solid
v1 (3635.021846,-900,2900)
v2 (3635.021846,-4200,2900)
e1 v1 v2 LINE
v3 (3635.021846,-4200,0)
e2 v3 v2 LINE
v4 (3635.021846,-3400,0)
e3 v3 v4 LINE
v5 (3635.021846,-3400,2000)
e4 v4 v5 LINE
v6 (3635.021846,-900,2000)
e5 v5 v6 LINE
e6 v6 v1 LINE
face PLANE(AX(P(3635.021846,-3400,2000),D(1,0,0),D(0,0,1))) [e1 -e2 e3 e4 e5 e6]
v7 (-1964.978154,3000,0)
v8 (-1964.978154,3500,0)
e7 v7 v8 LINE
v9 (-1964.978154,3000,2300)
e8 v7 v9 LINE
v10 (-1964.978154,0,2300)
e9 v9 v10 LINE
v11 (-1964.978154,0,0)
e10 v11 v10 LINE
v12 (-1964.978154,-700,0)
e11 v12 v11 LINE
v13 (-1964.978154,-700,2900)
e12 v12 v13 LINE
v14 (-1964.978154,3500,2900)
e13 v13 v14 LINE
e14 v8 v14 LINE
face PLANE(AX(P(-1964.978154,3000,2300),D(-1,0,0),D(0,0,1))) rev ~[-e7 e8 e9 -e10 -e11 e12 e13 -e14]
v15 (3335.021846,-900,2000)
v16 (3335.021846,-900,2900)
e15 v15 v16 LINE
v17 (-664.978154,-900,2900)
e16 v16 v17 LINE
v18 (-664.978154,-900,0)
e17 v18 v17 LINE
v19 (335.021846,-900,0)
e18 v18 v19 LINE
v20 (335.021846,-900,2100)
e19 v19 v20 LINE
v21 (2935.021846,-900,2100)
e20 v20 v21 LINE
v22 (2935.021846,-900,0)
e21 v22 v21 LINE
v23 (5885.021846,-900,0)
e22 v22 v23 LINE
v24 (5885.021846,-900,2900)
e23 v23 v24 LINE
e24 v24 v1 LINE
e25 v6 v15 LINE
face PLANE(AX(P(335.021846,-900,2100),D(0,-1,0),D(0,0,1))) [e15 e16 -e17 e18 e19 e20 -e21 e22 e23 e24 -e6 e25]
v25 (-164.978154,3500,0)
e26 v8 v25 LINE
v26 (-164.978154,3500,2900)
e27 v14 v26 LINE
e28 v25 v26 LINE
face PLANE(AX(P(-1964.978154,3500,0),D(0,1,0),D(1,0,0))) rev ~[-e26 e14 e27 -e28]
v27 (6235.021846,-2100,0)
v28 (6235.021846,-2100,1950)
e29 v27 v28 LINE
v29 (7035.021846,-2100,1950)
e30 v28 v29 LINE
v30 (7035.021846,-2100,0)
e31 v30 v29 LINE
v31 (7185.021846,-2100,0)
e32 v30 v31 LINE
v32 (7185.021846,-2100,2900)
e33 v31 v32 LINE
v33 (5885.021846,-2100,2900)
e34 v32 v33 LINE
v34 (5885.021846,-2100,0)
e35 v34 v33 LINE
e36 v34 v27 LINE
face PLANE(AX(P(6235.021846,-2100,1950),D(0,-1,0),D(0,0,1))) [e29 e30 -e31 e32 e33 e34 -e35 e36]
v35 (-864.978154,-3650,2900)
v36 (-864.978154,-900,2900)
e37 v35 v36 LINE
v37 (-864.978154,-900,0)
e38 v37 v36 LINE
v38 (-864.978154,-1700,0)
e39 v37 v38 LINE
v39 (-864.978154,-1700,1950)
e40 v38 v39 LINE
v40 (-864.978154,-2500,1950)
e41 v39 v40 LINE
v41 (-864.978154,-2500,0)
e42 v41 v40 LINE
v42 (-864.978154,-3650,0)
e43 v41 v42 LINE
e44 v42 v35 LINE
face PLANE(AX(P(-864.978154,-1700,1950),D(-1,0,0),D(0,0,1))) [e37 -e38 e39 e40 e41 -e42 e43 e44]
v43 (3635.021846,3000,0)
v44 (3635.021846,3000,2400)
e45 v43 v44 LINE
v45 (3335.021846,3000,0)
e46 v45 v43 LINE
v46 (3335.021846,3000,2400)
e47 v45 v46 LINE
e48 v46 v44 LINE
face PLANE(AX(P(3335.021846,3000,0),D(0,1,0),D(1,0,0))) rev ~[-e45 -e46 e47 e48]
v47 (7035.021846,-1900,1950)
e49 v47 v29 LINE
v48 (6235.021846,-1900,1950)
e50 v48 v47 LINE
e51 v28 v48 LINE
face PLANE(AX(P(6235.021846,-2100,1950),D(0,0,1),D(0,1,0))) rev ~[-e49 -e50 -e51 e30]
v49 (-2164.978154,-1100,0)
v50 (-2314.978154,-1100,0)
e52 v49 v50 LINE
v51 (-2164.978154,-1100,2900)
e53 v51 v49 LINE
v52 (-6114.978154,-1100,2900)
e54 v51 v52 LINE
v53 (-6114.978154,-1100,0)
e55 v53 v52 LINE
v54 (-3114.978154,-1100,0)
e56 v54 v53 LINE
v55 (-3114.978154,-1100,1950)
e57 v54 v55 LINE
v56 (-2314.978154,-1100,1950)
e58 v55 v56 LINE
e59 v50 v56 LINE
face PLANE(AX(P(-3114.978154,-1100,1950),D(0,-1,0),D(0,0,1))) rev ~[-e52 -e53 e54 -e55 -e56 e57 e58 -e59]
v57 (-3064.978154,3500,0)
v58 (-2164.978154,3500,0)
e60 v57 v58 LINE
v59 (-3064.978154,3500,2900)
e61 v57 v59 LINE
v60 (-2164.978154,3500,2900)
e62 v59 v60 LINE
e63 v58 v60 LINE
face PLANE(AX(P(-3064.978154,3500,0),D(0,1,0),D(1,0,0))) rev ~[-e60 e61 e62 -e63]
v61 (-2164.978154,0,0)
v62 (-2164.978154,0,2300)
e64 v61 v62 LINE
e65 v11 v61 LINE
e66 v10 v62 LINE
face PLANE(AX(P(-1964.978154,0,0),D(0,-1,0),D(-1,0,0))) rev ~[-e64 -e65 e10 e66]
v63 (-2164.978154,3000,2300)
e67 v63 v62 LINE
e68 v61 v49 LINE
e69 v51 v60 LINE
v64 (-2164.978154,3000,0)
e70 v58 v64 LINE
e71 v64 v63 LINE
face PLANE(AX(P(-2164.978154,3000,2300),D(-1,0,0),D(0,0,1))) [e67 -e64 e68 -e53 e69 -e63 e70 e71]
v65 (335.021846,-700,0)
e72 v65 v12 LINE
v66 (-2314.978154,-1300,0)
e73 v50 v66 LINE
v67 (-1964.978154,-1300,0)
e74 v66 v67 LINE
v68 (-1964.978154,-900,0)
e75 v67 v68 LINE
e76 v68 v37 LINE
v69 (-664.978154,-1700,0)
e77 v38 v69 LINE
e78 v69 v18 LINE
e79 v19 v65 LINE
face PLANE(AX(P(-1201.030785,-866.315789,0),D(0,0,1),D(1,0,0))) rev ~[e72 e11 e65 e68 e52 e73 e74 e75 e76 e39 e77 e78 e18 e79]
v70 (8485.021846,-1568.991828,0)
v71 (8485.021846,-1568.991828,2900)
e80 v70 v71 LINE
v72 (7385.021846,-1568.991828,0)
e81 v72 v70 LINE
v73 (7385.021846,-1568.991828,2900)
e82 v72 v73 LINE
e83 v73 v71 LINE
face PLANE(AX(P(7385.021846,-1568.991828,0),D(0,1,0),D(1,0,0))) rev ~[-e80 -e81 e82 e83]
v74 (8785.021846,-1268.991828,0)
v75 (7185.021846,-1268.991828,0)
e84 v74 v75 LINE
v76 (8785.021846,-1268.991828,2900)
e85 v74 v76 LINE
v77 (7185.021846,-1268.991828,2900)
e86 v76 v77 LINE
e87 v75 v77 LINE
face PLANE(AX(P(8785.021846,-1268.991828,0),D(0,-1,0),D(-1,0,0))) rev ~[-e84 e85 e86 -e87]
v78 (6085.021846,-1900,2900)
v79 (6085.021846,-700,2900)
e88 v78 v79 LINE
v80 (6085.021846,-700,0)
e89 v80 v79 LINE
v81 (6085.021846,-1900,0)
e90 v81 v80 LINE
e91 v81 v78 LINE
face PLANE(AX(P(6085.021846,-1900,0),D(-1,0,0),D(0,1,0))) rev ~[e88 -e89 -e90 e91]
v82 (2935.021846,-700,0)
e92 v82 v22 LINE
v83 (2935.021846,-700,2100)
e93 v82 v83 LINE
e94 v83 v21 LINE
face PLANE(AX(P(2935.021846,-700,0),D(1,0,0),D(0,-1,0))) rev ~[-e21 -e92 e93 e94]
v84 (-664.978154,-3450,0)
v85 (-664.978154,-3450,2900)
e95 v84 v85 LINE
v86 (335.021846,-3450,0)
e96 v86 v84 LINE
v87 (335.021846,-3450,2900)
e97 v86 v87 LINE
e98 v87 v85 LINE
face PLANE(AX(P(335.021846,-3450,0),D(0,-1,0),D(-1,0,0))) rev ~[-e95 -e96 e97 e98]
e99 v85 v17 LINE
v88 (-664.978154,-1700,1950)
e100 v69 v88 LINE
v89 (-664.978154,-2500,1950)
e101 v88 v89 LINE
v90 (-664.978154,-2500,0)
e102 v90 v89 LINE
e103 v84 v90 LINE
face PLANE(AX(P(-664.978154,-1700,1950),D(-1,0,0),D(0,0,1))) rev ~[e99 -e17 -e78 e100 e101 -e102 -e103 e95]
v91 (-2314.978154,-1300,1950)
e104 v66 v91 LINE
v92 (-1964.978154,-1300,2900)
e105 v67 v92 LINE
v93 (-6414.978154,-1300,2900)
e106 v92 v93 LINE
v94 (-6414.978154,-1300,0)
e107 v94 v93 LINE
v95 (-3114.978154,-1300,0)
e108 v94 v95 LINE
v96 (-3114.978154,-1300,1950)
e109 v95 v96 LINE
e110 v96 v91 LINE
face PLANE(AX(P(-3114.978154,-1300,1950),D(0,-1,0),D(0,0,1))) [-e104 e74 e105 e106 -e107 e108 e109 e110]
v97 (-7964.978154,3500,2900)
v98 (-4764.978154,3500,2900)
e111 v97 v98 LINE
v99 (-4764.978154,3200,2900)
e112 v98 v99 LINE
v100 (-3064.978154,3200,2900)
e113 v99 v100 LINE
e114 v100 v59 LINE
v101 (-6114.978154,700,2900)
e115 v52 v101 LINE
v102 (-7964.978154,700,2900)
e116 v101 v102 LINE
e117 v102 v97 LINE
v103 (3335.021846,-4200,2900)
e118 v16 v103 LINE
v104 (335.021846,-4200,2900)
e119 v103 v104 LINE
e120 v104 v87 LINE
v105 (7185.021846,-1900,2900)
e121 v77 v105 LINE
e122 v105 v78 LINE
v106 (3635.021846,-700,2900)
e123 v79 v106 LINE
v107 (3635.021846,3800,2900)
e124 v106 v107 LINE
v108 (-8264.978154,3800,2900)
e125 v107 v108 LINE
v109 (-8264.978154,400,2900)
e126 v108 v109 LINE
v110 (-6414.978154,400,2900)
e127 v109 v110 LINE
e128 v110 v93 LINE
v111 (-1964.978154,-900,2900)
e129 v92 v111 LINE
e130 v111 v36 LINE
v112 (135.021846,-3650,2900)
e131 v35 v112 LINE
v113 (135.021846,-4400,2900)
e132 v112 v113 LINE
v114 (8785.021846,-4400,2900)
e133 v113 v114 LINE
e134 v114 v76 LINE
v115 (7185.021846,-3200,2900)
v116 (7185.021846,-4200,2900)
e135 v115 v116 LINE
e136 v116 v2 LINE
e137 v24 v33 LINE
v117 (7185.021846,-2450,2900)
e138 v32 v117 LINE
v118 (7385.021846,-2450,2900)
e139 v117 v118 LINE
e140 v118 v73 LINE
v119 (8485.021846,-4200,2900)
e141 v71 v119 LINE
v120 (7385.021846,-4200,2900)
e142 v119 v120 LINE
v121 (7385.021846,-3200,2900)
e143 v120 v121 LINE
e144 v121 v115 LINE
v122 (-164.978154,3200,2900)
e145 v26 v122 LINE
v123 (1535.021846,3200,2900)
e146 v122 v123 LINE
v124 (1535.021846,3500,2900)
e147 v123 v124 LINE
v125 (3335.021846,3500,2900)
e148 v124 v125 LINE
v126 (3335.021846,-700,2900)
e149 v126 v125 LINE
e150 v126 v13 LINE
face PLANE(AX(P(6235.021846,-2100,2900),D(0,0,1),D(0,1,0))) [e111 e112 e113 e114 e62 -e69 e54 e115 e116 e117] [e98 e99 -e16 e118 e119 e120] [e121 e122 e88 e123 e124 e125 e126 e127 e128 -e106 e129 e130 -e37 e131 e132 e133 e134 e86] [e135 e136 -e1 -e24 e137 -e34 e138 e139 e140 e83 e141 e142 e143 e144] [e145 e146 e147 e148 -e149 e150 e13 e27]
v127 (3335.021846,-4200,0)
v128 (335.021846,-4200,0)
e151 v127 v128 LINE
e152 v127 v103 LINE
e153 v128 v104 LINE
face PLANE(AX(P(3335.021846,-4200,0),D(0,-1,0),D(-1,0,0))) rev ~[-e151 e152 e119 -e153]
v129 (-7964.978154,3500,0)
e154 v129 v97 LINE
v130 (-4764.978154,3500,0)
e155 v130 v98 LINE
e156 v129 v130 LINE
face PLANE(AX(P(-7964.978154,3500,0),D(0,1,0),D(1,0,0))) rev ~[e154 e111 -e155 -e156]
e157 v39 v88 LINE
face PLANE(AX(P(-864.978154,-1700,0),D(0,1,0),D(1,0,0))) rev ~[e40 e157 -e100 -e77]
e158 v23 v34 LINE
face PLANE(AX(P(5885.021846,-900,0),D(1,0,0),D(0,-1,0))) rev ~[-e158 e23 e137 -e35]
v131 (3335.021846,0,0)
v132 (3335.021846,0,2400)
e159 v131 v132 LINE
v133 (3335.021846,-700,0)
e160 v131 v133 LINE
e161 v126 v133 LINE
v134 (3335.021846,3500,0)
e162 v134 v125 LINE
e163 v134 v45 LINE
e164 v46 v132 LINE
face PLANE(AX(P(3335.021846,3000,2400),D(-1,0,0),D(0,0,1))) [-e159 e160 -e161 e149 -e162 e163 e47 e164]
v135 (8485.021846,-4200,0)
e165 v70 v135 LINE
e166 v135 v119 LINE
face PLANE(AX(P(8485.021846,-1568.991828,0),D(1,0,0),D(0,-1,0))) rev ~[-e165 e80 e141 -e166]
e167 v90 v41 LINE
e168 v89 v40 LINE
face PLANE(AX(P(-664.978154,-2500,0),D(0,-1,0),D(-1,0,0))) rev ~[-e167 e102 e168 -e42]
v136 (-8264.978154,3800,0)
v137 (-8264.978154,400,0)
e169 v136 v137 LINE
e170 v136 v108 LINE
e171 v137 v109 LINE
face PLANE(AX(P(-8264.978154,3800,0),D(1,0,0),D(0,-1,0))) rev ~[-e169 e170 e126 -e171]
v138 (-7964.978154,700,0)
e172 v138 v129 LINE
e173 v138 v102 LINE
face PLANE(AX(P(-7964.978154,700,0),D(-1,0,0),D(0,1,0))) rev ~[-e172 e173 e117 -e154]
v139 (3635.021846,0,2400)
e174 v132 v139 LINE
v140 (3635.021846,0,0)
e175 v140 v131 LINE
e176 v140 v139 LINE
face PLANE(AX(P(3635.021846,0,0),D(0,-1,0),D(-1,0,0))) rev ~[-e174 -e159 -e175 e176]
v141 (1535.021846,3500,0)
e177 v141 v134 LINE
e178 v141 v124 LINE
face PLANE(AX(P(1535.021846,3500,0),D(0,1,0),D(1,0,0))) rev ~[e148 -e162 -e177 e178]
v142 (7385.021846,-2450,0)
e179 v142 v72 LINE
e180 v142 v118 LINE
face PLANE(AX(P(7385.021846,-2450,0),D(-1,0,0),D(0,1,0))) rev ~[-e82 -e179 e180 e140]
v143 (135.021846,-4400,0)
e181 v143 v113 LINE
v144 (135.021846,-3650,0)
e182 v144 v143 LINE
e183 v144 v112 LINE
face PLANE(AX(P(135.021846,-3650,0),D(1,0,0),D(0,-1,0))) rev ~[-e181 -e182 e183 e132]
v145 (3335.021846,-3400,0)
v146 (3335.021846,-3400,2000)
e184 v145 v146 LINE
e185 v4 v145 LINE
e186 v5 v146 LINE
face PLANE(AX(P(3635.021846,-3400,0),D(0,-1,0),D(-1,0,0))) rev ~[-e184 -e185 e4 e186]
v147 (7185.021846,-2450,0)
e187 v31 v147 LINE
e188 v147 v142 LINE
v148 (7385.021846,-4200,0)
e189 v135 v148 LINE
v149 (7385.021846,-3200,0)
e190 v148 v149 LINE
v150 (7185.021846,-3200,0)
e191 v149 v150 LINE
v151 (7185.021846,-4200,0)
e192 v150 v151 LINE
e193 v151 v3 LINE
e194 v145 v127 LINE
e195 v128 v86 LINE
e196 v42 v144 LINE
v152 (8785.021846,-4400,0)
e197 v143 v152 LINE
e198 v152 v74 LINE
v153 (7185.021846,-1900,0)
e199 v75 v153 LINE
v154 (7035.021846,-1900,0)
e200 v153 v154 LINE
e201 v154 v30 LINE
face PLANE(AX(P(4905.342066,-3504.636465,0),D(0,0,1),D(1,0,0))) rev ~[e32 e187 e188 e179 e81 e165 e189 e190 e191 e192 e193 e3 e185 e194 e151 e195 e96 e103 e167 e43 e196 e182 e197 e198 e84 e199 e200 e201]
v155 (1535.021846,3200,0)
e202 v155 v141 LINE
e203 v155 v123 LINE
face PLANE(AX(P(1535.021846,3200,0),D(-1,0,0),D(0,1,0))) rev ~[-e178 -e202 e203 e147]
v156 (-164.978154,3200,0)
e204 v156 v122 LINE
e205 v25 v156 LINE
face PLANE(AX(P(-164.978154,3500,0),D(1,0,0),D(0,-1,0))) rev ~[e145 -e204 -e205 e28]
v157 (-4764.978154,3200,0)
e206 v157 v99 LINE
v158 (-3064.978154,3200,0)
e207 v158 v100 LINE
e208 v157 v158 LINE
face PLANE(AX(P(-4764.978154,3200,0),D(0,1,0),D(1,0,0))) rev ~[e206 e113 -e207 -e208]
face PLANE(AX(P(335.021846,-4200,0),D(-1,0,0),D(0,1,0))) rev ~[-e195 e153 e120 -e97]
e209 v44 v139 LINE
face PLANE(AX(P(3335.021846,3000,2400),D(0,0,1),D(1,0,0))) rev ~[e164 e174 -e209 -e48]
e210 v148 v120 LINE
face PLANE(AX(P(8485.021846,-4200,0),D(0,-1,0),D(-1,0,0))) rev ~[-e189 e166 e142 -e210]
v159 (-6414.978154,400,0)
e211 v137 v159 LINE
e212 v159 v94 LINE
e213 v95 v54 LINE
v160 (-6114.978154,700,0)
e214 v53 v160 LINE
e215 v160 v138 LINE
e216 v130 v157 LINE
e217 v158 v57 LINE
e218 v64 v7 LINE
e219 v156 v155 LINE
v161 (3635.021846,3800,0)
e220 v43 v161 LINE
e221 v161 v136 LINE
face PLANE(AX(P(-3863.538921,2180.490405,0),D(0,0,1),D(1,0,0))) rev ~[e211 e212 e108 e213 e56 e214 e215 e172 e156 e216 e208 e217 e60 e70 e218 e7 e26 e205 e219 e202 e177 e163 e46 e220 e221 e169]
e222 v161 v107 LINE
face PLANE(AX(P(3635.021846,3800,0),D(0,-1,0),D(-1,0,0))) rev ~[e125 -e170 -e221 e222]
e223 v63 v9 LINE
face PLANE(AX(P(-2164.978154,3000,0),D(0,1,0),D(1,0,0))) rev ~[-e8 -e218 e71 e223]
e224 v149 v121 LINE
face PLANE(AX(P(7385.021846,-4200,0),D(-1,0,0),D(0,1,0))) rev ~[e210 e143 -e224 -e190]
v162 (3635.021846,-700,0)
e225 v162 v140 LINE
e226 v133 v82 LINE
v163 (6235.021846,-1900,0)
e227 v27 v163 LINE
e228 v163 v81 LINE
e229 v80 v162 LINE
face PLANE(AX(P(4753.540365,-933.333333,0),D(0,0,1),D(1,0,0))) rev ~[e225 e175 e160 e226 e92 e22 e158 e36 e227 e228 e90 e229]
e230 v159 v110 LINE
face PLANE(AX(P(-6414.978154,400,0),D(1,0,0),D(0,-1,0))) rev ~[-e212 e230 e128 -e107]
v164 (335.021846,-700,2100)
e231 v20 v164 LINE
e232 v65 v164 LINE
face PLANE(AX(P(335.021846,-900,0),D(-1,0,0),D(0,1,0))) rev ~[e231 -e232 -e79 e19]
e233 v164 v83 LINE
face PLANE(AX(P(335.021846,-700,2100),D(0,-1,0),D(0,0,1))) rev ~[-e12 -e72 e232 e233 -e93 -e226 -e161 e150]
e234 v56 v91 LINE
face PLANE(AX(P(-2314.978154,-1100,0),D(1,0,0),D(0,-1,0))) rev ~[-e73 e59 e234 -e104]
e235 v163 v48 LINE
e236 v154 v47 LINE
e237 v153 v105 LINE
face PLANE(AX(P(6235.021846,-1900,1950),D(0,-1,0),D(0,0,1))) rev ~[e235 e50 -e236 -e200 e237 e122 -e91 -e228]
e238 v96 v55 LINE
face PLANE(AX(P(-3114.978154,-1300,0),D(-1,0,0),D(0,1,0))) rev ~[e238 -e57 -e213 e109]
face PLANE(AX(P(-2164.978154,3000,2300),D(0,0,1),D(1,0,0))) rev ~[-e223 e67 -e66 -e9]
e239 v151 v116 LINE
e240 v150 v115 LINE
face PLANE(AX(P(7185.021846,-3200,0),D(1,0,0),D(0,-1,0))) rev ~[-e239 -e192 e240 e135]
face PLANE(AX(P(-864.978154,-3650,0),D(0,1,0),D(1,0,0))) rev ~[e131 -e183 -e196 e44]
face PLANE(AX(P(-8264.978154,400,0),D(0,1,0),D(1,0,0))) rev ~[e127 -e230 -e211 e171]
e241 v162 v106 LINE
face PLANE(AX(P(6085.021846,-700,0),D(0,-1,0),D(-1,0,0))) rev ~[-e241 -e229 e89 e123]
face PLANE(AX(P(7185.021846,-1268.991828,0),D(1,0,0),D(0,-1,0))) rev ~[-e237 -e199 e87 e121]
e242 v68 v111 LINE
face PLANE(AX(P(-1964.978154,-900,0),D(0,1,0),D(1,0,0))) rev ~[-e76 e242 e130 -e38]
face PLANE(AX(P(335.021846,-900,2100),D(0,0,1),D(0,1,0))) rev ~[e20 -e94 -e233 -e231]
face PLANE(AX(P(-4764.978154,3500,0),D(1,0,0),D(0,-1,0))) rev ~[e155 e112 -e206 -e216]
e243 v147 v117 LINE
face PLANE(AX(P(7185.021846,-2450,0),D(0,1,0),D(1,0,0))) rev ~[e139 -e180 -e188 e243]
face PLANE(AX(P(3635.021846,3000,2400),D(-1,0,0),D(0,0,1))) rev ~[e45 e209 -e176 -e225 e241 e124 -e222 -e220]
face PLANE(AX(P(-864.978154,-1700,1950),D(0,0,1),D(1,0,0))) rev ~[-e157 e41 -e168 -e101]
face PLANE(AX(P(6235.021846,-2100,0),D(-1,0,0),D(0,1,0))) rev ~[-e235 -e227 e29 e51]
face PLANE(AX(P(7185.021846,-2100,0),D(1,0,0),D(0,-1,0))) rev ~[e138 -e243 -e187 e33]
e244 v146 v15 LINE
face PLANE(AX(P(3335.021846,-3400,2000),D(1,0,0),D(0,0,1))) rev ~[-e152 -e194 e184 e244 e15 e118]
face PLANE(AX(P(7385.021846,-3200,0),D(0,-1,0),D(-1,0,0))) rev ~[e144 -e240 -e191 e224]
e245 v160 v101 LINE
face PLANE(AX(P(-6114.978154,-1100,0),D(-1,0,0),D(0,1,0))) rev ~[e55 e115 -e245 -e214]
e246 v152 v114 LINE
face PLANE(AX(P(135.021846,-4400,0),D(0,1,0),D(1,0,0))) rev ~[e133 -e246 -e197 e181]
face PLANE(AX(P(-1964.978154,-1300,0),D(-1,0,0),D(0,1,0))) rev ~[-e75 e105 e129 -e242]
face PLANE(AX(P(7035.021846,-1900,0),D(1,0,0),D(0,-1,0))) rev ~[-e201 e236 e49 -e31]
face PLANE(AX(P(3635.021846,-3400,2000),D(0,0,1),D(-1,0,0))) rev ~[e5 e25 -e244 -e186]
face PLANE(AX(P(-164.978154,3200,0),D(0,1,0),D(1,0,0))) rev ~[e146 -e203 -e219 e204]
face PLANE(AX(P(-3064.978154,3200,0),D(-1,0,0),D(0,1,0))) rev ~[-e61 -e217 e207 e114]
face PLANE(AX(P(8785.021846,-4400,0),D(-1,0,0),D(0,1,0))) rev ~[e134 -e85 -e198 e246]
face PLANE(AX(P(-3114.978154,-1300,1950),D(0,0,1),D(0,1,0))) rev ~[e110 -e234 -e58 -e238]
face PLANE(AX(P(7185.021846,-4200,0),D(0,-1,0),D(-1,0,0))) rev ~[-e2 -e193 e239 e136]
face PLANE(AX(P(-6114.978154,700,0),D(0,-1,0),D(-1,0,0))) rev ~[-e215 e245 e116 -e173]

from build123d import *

# Parameters (mm, degrees)
F1_DEPTH  = 2900
F2_W      = 300
F2_H      = 500
F3_DEPTH  = 3000
F4_W      = 200
F4_H      = 600
F5_DEPTH  = 3500
F6_W      = 200
F6_H      = 950
F7_DEPTH  = 1000
F8_W      = 200
F8_H      = 950
F9_DEPTH  = 1000
F10_W     = 200
F10_H     = 800
F11_DEPTH = 3000
F12_W     = 300
F12_H     = 900
F13_DEPTH = 2580
F14_W     = 200
F14_H     = 950
F15_DEPTH = 830


# Not quite as in the source:
# - a feature names something its author has since deleted; it is built from what else it names


with BuildPart() as f1:
    # F0 (on Top) → F1 (new body)
    with BuildSketch(Plane.XY):
        Polygon((3635.0218463784, 3800), (-8264.9781536216, 3800), (-8264.9781536216, 400), (-6414.9781536216, 400), (-6414.9781536216, -1300), (-3114.9781536216, -1300), (-3114.9781536216, -1100), (-6114.9781536216, -1100), (-6114.9781536216, 700), (-7964.9781536216, 700), (-7964.9781536216, 3500), (-4764.9781536216, 3500), (-4764.9781536216, 3200), (-3064.9781536216, 3200), (-3064.9781536216, 3500), (-2164.9781536216, 3500), (-2164.9781536216, 3000), (-1964.9781536216, 3000), (-1964.9781536216, 3500), (-164.9781536216, 3500), (-164.9781536216, 3200), (1535.0218463784, 3200), (1535.0218463784, 3500), (3335.0218463784, 3500), (3335.0218463784, 3000), (3635.0218463784, 3000), align=None)
    extrude(amount=F1_DEPTH)



with BuildPart() as f1b:
    # F0 (on Top) → F1, piece 2 (new body)
    with BuildSketch(Plane.XY):
        Polygon((-2164.9781536216, 0), (-2164.9781536216, -1100), (-2314.9781536216, -1100), (-2314.9781536216, -1300), (-1964.9781536216, -1300), (-1964.9781536216, -900), (-864.9781536216, -900), (-864.9781536216, -1700), (-664.9781536216, -1700), (-664.9781536216, -900), (335.0218463784, -900), (335.0218463784, -700), (-1964.9781536216, -700), (-1964.9781536216, 0), align=None)
    extrude(amount=F1_DEPTH)


with BuildPart() as f1c:
    # F0 (on Top) → F1, piece 3 (new body)
    with BuildSketch(Plane.XY):
        Polygon((3335.0218463784, -700), (2935.0218463784, -700), (2935.0218463784, -900), (5885.0218463784, -900), (5885.0218463784, -2100), (6235.0218463784, -2100), (6235.0218463784, -1900), (6085.0218463784, -1900), (6085.0218463784, -700), (3635.0218463784, -700), (3635.0218463784, 0), (3335.0218463784, 0), align=None)
    extrude(amount=F1_DEPTH)


with BuildPart() as f1d:
    # F0 (on Top) → F1, piece 4 (new body)
    with BuildSketch(Plane.XY):
        Polygon((7185.0218463784, -4200), (3635.0218463784, -4200), (3635.0218463784, -3400), (3335.0218463784, -3400), (3335.0218463784, -4200), (335.0218463784, -4200), (335.0218463784, -3450), (-664.9781536216, -3450), (-664.9781536216, -2500), (-864.9781536216, -2500), (-864.9781536216, -3650), (135.0218463784, -3650), (135.0218463784, -4400), (8785.0218463784, -4400), (8785.0218463784, -1268.9918279648), (7185.0218463784, -1268.9918279648), (7185.0218463784, -1900), (7035.0218463784, -1900), (7035.0218463784, -2100), (7185.0218463784, -2100), (7185.0218463784, -2450), (7385.0218463784, -2450), (7385.0218463784, -1568.9918279648), (8485.0218463784, -1568.9918279648), (8485.0218463784, -4200), (7385.0218463784, -4200), (7385.0218463784, -3200), (7185.0218463784, -3200), align=None)
    extrude(amount=F1_DEPTH)


with BuildPart() as f1_1:
    add(f1.part)

    add(f1c.part)  # F3 merges F1c
    # F2 (on face) → F3 (join)
    with BuildSketch(Plane.XZ.offset(-3000)):
        with Locations((3485.0218463784, 2650)):
            Rectangle(F2_W, F2_H)
    extrude(amount=F3_DEPTH)


    add(f1b.part)  # F5 merges F1b
    # F4 (on face) → F5 (join)
    with BuildSketch(Plane.XZ.offset(-3000)):
        with Locations((-2064.9781536216, 2600)):
            Rectangle(F4_W, F4_H)
    extrude(amount=F5_DEPTH)


    add(f1d.part)  # F7 merges F1d
    # F6 (on face) → F7 (join)
    with BuildSketch(Plane.XZ.offset(1700)):
        with Locations((-764.9781536216, 2425)):
            Rectangle(F6_W, F6_H)
    extrude(amount=F7_DEPTH)

    # F8 (on face) → F9 (join)
    with BuildSketch(Plane.YZ.offset(-3114.9781536216)):
        with Locations((-1200, 2425)):
            Rectangle(F8_W, F8_H)
    extrude(amount=F9_DEPTH)

    # F10 (on face) → F11 (join)
    with BuildSketch(Plane.YZ.offset(335.0218463784)):
        with Locations((-800, 2500)):
            Rectangle(F10_W, F10_H)
    extrude(amount=F11_DEPTH)

    # F12 (on face) → F13 (join)
    with BuildSketch(Plane(origin=(0, -3400, 0), x_dir=(-1, 0, 0), z_dir=(0, 1, 0))):
        with Locations((-3485.0218463784, 2450)):
            Rectangle(F12_W, F12_H)
    extrude(amount=F13_DEPTH)

    # F14 (on face) → F15 (join)
    with BuildSketch(Plane.YZ.offset(6235.0218463784)):
        with Locations((-2000, 2425)):
            Rectangle(F14_W, F14_H)
    extrude(amount=F15_DEPTH)


solid = f1_1.part
